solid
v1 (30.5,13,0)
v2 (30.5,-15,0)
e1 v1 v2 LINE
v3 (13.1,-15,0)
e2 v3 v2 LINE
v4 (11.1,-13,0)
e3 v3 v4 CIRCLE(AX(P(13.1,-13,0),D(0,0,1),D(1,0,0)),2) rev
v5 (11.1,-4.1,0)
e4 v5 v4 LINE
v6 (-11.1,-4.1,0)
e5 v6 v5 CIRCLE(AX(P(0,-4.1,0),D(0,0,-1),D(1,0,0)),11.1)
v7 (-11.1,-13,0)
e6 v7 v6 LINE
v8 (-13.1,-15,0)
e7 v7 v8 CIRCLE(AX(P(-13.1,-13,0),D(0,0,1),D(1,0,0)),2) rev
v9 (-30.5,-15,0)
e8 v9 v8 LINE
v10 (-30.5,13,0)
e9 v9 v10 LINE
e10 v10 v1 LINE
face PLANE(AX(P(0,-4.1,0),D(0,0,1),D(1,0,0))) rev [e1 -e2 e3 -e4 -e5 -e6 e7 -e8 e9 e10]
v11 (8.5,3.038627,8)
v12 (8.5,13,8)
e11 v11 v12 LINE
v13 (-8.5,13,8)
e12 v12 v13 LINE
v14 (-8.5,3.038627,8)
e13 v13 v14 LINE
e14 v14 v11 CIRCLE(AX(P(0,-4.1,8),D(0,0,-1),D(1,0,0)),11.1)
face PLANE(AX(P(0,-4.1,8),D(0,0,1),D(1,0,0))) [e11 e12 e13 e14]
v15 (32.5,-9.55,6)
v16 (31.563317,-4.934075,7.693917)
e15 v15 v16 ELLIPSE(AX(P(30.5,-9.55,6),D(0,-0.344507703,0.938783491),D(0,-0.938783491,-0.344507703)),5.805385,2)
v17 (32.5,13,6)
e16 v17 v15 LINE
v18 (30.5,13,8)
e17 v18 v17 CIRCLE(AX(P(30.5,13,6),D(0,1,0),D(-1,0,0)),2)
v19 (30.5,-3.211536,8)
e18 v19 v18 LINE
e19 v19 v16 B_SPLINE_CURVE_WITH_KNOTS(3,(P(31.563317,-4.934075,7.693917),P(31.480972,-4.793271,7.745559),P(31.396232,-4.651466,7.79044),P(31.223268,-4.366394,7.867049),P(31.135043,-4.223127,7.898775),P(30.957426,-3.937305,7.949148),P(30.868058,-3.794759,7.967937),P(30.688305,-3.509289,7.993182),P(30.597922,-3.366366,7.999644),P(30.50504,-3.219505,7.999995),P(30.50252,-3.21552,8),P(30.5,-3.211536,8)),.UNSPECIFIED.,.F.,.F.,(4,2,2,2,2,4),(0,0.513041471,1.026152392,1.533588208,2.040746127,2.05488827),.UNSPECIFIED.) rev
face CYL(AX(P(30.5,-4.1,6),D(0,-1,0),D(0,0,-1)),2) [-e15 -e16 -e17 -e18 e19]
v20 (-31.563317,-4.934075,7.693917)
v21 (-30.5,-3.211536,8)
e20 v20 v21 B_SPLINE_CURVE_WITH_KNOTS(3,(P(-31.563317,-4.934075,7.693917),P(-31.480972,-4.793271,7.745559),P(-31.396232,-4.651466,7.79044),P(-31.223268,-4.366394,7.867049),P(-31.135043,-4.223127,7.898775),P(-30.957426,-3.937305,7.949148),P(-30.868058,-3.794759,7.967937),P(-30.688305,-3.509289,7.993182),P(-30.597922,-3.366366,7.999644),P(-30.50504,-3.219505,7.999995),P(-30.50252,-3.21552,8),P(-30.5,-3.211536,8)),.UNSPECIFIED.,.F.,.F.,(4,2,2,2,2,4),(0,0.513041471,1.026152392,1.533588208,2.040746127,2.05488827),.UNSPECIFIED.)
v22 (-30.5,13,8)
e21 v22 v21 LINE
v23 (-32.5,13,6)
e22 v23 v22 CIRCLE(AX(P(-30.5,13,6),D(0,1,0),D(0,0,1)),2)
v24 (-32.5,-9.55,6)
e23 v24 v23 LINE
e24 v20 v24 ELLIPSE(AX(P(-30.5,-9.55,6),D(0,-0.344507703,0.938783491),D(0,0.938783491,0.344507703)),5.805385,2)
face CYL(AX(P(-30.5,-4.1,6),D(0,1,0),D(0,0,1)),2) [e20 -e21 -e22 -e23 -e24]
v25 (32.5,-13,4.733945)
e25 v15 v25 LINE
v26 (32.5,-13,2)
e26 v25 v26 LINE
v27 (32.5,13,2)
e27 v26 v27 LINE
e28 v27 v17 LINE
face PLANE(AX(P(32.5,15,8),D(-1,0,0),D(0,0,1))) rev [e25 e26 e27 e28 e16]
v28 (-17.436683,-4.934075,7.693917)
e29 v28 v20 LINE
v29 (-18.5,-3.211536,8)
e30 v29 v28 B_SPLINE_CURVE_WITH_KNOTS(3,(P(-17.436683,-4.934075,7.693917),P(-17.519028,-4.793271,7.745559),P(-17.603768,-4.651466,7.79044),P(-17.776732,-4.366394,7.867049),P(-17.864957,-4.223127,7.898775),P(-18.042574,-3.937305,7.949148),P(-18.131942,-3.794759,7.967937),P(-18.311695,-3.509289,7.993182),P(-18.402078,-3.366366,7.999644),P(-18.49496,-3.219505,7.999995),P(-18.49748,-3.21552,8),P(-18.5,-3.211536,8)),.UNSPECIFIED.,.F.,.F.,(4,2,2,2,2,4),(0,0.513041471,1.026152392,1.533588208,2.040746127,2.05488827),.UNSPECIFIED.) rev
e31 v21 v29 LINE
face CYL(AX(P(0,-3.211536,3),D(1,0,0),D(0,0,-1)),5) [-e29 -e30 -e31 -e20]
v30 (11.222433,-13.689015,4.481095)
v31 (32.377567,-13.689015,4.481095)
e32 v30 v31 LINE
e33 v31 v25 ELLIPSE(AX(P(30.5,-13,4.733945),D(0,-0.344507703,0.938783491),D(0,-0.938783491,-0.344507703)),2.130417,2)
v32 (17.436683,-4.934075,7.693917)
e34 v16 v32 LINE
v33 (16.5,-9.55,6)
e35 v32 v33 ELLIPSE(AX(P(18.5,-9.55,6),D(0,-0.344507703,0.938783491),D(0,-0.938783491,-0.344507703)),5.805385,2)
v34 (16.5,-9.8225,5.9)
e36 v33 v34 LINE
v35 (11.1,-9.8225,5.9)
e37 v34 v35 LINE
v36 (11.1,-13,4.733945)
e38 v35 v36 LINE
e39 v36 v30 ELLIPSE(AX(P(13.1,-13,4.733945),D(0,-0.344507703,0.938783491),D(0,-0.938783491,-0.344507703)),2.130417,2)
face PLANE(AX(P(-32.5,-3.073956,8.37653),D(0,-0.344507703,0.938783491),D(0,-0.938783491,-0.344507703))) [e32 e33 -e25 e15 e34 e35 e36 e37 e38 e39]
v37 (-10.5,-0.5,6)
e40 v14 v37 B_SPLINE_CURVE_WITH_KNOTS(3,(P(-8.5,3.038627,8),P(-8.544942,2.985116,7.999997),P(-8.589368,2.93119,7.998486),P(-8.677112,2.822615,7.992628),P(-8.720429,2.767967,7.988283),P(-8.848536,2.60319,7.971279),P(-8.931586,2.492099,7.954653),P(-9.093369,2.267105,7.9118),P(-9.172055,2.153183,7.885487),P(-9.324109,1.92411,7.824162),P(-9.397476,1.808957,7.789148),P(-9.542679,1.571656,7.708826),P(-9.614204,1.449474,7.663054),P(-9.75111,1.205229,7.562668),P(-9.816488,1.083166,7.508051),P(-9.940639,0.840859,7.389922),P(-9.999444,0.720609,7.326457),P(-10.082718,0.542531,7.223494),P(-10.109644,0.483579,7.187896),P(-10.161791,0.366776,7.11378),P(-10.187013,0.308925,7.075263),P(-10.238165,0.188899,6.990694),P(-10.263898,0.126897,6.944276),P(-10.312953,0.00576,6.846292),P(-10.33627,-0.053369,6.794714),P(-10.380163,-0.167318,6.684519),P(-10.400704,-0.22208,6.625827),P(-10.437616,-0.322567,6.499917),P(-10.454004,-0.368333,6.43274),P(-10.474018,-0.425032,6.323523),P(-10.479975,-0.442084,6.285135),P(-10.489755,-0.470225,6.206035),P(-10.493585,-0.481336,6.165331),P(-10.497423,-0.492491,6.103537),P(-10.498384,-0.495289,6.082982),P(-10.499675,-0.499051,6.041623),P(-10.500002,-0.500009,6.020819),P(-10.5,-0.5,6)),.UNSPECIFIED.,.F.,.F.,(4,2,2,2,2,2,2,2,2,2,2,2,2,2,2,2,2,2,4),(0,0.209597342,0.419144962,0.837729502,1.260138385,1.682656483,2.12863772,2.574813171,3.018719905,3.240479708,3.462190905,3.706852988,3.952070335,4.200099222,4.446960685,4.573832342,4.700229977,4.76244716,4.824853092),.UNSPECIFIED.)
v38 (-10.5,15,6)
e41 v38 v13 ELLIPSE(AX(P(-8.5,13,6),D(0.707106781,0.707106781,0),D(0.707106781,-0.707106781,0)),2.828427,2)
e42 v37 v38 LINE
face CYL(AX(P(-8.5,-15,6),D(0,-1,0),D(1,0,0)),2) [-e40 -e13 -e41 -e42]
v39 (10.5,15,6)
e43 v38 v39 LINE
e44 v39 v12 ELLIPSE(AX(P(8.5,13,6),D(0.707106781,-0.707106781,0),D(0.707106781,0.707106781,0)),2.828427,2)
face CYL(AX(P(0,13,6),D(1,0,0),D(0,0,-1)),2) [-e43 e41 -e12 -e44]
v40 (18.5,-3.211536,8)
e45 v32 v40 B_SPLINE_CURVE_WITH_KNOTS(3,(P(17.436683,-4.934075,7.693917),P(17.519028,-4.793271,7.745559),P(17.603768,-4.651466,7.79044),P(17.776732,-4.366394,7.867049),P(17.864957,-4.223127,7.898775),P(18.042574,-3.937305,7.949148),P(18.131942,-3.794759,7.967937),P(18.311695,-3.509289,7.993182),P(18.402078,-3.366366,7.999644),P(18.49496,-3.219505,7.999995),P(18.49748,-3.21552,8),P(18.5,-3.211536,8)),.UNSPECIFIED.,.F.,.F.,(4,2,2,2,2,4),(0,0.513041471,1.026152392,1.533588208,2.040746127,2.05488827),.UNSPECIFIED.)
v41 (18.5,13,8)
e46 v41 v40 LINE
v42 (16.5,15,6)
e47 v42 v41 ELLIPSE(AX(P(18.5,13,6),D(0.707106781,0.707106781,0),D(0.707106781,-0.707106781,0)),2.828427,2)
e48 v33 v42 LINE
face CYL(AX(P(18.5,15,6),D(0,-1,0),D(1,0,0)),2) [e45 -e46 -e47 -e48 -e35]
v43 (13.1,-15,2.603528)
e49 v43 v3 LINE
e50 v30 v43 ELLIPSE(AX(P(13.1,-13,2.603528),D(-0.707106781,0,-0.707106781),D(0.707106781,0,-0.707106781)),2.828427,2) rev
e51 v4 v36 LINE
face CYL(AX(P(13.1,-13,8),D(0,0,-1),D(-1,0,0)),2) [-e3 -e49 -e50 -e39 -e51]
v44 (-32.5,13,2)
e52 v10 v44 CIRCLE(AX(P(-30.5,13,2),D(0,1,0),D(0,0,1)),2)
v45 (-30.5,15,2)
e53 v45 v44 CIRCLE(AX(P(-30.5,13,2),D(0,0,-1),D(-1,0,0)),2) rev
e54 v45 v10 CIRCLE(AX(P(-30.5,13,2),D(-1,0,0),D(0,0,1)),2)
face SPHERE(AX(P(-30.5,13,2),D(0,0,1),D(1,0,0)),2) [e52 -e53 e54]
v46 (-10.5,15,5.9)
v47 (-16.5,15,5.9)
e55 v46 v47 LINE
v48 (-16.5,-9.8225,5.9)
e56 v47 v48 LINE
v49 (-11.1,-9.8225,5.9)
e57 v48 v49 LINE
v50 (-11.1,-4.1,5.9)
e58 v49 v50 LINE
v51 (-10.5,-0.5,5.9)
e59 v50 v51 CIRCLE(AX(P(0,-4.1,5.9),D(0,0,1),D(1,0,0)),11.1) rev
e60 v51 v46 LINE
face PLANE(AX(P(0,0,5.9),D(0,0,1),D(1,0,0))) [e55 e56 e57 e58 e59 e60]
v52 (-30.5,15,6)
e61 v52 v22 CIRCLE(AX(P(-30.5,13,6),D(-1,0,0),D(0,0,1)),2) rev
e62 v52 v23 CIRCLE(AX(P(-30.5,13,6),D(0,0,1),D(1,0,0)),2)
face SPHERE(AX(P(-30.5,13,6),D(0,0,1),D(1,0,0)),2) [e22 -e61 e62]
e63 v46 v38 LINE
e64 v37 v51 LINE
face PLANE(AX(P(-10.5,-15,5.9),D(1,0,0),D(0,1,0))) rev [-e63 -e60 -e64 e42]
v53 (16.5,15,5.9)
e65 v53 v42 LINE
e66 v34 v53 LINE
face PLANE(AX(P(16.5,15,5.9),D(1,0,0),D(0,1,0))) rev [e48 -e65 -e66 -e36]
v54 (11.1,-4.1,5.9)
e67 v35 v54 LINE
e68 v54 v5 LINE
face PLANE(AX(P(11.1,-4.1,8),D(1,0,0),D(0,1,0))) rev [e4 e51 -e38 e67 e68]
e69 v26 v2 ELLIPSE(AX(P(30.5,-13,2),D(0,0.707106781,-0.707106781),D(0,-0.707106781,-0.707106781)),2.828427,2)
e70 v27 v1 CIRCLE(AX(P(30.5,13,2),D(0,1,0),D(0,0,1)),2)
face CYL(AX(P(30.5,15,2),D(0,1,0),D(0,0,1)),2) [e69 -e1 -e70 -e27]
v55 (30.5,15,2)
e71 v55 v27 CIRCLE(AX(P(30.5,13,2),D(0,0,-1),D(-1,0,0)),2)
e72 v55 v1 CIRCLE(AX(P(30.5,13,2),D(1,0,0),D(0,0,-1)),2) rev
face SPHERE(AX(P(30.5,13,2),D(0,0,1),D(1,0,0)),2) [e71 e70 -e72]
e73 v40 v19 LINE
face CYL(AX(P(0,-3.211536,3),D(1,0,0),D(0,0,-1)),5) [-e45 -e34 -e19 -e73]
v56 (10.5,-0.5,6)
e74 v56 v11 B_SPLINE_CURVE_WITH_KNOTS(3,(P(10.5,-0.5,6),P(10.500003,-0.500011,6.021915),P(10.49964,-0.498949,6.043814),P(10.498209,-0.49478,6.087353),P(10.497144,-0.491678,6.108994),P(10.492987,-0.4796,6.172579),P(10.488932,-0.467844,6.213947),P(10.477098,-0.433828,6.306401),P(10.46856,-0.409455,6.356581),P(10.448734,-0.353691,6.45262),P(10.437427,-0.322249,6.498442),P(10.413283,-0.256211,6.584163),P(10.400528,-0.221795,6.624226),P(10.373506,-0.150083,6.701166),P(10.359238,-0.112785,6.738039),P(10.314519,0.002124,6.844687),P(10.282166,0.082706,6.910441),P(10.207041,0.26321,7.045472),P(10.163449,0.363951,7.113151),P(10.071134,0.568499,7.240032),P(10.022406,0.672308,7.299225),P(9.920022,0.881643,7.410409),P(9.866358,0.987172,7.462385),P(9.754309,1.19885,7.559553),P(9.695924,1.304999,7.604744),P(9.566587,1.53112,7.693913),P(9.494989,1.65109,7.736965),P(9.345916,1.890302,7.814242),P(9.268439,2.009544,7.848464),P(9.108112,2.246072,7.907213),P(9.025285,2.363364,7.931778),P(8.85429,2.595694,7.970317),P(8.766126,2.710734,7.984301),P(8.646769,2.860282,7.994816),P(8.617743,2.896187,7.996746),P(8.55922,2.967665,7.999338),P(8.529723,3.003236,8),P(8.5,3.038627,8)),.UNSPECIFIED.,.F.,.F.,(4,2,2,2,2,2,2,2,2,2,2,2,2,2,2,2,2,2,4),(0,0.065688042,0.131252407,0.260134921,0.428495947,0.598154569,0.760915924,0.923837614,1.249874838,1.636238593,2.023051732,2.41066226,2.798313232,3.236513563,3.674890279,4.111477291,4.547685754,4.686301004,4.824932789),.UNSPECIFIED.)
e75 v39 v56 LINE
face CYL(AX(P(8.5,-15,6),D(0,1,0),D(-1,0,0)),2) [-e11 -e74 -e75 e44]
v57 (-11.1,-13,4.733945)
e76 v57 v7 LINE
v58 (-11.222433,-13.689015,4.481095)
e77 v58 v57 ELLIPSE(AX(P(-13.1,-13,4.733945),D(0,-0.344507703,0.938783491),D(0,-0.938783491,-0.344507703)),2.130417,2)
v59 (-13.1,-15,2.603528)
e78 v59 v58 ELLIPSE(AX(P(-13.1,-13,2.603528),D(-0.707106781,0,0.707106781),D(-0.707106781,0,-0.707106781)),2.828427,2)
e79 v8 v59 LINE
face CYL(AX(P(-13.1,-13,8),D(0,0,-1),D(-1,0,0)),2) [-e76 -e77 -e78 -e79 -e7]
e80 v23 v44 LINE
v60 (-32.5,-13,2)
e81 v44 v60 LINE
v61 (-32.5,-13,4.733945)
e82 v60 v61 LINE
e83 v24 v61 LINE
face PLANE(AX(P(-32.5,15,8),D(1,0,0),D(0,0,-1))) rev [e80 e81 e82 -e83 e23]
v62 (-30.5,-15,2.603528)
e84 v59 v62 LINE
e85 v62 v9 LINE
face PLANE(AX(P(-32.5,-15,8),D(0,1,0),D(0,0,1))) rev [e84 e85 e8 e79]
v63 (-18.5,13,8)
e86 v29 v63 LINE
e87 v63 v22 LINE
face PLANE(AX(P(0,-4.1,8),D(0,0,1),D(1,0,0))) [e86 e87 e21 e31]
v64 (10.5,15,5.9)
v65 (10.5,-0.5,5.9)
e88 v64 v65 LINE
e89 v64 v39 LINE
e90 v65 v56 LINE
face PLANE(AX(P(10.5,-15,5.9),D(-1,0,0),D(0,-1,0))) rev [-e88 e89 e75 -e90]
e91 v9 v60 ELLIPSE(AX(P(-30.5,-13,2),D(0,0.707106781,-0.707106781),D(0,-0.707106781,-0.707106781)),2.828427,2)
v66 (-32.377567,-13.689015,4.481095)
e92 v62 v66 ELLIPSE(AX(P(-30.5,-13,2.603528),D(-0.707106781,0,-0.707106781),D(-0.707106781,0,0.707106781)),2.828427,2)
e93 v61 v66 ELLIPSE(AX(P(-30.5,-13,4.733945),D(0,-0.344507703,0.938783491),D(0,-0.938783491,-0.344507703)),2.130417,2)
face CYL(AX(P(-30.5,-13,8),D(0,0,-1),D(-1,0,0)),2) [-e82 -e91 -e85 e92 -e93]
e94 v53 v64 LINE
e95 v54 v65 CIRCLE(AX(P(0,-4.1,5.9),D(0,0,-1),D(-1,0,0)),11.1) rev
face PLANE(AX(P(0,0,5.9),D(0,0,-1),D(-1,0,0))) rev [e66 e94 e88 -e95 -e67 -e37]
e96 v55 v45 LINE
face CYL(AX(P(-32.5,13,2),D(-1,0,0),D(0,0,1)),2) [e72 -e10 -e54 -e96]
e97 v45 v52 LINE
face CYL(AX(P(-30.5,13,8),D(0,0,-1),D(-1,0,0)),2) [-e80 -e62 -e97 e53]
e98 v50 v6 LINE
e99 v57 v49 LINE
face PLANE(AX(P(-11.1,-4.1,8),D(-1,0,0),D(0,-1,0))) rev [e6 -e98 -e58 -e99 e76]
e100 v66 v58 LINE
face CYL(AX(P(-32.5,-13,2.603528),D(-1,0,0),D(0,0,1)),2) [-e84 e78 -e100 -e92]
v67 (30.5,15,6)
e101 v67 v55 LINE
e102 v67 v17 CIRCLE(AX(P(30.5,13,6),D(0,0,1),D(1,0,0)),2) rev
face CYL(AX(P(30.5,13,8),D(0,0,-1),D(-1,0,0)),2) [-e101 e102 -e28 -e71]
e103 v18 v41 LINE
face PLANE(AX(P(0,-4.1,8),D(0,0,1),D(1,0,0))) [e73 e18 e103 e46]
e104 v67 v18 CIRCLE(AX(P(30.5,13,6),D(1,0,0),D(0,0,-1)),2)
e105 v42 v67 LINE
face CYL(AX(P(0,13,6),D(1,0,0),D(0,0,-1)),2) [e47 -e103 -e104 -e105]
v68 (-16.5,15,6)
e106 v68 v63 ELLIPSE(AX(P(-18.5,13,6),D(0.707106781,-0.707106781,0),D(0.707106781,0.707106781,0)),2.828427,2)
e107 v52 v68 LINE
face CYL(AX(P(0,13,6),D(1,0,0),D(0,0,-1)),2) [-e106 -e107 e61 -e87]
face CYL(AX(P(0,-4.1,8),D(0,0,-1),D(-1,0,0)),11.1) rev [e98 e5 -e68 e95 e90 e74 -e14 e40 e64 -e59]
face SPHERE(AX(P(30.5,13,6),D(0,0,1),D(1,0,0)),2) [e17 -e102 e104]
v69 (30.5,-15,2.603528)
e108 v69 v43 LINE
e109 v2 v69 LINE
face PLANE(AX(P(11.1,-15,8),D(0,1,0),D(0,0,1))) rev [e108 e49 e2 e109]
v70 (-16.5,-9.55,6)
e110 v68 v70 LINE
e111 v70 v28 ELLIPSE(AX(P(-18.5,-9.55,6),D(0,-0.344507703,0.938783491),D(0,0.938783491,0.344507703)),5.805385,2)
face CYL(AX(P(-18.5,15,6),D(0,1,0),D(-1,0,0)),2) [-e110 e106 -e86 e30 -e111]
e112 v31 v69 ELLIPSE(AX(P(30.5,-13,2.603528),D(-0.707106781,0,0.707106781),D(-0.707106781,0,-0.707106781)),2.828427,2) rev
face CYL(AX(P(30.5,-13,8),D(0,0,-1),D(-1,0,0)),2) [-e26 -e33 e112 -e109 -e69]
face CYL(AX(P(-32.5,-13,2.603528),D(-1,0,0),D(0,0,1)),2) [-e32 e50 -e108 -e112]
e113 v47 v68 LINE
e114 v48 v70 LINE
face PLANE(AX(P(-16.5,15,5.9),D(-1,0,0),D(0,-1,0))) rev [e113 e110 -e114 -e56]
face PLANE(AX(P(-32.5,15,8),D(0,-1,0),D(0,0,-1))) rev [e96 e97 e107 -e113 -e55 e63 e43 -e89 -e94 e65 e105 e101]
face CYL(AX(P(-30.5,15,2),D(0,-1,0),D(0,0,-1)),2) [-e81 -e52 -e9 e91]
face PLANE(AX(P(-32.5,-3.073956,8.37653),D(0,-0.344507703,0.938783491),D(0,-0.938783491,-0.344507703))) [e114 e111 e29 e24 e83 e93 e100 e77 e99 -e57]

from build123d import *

# Parameters (mm, degrees)
EXTRUDE_1_DEPTH     = 8
SKETCH_3_W          = 6
SKETCH_3_H          = 30
CUT_EXTRUDE_2_DEPTH = 2.1
CUT_EXTRUDE_3_DEPTH = 68.186308129
FILLET_1_R          = 2
FILLET_2_R          = 5


with BuildPart() as part:
    # 草图1 → 凸台-拉伸1 (new body)
    with BuildSketch(Plane.XY):
        with BuildLine():
            Line((-11.1, -4.1), (-11.1, -15))
            Line((-11.1, -15), (-32.5, -15))
            Line((-32.5, -15), (-32.5, 15))
            Line((-32.5, 15), (32.5, 15))
            Line((32.5, 15), (32.5, -15))
            Line((32.5, -15), (11.1, -15))
            Line((11.1, -15), (11.1, -4.1))
            ThreePointArc((11.1, -4.1), (0, 7), (-11.1, -4.1))
        make_face()
    extrude(amount=EXTRUDE_1_DEPTH)

    # 草图3 → 切除-拉伸2 (cut)
    with BuildSketch(Plane.XY.offset(8)):
        with Locations((-13.5, 0)):
            Rectangle(SKETCH_3_W, SKETCH_3_H)
        with Locations((13.5, 0)):
            Rectangle(SKETCH_3_W, SKETCH_3_H)
    extrude(amount=-CUT_EXTRUDE_2_DEPTH, mode=Mode.SUBTRACT)

    # 草图2 → 切除-拉伸3 (cut, through all)
    with BuildSketch(Plane(origin=(32.5, 0, 0), x_dir=(0, 0, -1), z_dir=(1, 0, 0))):
        Polygon((-4, -15), (-8, -4.1), (-8, -15), align=None)
    extrude(amount=-CUT_EXTRUDE_3_DEPTH, mode=Mode.SUBTRACT)

    # 圆角1
    fillet_1_edges = [part.edges().sort_by_distance(p)[0] for p in [
        (-32.5, 0, 0),
        (0, 15, 0),
        (32.5, 0, 0),
        (24.5, 15, 8),
        (-32.5, 15, 4),
        (32.5, 15, 4),
        (-32.5, 5.45, 8),
        (0, 15, 8),
        (-24.5, 15, 8),
        (-10.5, 7.25, 8),
        (-16.5, 5.45, 8),
        (10.5, 7.25, 8),
        (16.5, 5.45, 8),
        (11.1, -15, 2),
        (-32.5, -15, 2),
        (-11.1, -15, 2),
        (32.5, 5.45, 8),
        (32.5, -15, 2),
        (21.8, -15, 4),
        (-21.8, -15, 4),
    ]]
    fillet(fillet_1_edges, radius=FILLET_1_R)

    # 圆角2
    # the kernel refuses this fillet: 5 mm, written as the material it takes off along each edge
    with BuildSketch(Plane(origin=(32.721158942, -4.1, 8), x_dir=(0, -0.9387834907734438, -0.34450770303612566), z_dir=(-1, 0, 0)), Plane(origin=(-16.278841058, -4.1, 8), x_dir=(0, -0.9387834907734438, -0.34450770303612566), z_dir=(-1, 0, 0))) as fillet_2_piece_1:
        with BuildLine():
            CenterArc((FILLET_2_R * 0.177692715394, -FILLET_2_R), FILLET_2_R, 90, 20.151747034)
            Line((-FILLET_2_R * 0.166814987642, -FILLET_2_R * 0.0612165092266), (0, 0))
            Line((0, 0), (FILLET_2_R * 0.177692715394, 0))
        make_face()
    extrude(amount=16.442317885, mode=Mode.SUBTRACT)


solid = part.part
